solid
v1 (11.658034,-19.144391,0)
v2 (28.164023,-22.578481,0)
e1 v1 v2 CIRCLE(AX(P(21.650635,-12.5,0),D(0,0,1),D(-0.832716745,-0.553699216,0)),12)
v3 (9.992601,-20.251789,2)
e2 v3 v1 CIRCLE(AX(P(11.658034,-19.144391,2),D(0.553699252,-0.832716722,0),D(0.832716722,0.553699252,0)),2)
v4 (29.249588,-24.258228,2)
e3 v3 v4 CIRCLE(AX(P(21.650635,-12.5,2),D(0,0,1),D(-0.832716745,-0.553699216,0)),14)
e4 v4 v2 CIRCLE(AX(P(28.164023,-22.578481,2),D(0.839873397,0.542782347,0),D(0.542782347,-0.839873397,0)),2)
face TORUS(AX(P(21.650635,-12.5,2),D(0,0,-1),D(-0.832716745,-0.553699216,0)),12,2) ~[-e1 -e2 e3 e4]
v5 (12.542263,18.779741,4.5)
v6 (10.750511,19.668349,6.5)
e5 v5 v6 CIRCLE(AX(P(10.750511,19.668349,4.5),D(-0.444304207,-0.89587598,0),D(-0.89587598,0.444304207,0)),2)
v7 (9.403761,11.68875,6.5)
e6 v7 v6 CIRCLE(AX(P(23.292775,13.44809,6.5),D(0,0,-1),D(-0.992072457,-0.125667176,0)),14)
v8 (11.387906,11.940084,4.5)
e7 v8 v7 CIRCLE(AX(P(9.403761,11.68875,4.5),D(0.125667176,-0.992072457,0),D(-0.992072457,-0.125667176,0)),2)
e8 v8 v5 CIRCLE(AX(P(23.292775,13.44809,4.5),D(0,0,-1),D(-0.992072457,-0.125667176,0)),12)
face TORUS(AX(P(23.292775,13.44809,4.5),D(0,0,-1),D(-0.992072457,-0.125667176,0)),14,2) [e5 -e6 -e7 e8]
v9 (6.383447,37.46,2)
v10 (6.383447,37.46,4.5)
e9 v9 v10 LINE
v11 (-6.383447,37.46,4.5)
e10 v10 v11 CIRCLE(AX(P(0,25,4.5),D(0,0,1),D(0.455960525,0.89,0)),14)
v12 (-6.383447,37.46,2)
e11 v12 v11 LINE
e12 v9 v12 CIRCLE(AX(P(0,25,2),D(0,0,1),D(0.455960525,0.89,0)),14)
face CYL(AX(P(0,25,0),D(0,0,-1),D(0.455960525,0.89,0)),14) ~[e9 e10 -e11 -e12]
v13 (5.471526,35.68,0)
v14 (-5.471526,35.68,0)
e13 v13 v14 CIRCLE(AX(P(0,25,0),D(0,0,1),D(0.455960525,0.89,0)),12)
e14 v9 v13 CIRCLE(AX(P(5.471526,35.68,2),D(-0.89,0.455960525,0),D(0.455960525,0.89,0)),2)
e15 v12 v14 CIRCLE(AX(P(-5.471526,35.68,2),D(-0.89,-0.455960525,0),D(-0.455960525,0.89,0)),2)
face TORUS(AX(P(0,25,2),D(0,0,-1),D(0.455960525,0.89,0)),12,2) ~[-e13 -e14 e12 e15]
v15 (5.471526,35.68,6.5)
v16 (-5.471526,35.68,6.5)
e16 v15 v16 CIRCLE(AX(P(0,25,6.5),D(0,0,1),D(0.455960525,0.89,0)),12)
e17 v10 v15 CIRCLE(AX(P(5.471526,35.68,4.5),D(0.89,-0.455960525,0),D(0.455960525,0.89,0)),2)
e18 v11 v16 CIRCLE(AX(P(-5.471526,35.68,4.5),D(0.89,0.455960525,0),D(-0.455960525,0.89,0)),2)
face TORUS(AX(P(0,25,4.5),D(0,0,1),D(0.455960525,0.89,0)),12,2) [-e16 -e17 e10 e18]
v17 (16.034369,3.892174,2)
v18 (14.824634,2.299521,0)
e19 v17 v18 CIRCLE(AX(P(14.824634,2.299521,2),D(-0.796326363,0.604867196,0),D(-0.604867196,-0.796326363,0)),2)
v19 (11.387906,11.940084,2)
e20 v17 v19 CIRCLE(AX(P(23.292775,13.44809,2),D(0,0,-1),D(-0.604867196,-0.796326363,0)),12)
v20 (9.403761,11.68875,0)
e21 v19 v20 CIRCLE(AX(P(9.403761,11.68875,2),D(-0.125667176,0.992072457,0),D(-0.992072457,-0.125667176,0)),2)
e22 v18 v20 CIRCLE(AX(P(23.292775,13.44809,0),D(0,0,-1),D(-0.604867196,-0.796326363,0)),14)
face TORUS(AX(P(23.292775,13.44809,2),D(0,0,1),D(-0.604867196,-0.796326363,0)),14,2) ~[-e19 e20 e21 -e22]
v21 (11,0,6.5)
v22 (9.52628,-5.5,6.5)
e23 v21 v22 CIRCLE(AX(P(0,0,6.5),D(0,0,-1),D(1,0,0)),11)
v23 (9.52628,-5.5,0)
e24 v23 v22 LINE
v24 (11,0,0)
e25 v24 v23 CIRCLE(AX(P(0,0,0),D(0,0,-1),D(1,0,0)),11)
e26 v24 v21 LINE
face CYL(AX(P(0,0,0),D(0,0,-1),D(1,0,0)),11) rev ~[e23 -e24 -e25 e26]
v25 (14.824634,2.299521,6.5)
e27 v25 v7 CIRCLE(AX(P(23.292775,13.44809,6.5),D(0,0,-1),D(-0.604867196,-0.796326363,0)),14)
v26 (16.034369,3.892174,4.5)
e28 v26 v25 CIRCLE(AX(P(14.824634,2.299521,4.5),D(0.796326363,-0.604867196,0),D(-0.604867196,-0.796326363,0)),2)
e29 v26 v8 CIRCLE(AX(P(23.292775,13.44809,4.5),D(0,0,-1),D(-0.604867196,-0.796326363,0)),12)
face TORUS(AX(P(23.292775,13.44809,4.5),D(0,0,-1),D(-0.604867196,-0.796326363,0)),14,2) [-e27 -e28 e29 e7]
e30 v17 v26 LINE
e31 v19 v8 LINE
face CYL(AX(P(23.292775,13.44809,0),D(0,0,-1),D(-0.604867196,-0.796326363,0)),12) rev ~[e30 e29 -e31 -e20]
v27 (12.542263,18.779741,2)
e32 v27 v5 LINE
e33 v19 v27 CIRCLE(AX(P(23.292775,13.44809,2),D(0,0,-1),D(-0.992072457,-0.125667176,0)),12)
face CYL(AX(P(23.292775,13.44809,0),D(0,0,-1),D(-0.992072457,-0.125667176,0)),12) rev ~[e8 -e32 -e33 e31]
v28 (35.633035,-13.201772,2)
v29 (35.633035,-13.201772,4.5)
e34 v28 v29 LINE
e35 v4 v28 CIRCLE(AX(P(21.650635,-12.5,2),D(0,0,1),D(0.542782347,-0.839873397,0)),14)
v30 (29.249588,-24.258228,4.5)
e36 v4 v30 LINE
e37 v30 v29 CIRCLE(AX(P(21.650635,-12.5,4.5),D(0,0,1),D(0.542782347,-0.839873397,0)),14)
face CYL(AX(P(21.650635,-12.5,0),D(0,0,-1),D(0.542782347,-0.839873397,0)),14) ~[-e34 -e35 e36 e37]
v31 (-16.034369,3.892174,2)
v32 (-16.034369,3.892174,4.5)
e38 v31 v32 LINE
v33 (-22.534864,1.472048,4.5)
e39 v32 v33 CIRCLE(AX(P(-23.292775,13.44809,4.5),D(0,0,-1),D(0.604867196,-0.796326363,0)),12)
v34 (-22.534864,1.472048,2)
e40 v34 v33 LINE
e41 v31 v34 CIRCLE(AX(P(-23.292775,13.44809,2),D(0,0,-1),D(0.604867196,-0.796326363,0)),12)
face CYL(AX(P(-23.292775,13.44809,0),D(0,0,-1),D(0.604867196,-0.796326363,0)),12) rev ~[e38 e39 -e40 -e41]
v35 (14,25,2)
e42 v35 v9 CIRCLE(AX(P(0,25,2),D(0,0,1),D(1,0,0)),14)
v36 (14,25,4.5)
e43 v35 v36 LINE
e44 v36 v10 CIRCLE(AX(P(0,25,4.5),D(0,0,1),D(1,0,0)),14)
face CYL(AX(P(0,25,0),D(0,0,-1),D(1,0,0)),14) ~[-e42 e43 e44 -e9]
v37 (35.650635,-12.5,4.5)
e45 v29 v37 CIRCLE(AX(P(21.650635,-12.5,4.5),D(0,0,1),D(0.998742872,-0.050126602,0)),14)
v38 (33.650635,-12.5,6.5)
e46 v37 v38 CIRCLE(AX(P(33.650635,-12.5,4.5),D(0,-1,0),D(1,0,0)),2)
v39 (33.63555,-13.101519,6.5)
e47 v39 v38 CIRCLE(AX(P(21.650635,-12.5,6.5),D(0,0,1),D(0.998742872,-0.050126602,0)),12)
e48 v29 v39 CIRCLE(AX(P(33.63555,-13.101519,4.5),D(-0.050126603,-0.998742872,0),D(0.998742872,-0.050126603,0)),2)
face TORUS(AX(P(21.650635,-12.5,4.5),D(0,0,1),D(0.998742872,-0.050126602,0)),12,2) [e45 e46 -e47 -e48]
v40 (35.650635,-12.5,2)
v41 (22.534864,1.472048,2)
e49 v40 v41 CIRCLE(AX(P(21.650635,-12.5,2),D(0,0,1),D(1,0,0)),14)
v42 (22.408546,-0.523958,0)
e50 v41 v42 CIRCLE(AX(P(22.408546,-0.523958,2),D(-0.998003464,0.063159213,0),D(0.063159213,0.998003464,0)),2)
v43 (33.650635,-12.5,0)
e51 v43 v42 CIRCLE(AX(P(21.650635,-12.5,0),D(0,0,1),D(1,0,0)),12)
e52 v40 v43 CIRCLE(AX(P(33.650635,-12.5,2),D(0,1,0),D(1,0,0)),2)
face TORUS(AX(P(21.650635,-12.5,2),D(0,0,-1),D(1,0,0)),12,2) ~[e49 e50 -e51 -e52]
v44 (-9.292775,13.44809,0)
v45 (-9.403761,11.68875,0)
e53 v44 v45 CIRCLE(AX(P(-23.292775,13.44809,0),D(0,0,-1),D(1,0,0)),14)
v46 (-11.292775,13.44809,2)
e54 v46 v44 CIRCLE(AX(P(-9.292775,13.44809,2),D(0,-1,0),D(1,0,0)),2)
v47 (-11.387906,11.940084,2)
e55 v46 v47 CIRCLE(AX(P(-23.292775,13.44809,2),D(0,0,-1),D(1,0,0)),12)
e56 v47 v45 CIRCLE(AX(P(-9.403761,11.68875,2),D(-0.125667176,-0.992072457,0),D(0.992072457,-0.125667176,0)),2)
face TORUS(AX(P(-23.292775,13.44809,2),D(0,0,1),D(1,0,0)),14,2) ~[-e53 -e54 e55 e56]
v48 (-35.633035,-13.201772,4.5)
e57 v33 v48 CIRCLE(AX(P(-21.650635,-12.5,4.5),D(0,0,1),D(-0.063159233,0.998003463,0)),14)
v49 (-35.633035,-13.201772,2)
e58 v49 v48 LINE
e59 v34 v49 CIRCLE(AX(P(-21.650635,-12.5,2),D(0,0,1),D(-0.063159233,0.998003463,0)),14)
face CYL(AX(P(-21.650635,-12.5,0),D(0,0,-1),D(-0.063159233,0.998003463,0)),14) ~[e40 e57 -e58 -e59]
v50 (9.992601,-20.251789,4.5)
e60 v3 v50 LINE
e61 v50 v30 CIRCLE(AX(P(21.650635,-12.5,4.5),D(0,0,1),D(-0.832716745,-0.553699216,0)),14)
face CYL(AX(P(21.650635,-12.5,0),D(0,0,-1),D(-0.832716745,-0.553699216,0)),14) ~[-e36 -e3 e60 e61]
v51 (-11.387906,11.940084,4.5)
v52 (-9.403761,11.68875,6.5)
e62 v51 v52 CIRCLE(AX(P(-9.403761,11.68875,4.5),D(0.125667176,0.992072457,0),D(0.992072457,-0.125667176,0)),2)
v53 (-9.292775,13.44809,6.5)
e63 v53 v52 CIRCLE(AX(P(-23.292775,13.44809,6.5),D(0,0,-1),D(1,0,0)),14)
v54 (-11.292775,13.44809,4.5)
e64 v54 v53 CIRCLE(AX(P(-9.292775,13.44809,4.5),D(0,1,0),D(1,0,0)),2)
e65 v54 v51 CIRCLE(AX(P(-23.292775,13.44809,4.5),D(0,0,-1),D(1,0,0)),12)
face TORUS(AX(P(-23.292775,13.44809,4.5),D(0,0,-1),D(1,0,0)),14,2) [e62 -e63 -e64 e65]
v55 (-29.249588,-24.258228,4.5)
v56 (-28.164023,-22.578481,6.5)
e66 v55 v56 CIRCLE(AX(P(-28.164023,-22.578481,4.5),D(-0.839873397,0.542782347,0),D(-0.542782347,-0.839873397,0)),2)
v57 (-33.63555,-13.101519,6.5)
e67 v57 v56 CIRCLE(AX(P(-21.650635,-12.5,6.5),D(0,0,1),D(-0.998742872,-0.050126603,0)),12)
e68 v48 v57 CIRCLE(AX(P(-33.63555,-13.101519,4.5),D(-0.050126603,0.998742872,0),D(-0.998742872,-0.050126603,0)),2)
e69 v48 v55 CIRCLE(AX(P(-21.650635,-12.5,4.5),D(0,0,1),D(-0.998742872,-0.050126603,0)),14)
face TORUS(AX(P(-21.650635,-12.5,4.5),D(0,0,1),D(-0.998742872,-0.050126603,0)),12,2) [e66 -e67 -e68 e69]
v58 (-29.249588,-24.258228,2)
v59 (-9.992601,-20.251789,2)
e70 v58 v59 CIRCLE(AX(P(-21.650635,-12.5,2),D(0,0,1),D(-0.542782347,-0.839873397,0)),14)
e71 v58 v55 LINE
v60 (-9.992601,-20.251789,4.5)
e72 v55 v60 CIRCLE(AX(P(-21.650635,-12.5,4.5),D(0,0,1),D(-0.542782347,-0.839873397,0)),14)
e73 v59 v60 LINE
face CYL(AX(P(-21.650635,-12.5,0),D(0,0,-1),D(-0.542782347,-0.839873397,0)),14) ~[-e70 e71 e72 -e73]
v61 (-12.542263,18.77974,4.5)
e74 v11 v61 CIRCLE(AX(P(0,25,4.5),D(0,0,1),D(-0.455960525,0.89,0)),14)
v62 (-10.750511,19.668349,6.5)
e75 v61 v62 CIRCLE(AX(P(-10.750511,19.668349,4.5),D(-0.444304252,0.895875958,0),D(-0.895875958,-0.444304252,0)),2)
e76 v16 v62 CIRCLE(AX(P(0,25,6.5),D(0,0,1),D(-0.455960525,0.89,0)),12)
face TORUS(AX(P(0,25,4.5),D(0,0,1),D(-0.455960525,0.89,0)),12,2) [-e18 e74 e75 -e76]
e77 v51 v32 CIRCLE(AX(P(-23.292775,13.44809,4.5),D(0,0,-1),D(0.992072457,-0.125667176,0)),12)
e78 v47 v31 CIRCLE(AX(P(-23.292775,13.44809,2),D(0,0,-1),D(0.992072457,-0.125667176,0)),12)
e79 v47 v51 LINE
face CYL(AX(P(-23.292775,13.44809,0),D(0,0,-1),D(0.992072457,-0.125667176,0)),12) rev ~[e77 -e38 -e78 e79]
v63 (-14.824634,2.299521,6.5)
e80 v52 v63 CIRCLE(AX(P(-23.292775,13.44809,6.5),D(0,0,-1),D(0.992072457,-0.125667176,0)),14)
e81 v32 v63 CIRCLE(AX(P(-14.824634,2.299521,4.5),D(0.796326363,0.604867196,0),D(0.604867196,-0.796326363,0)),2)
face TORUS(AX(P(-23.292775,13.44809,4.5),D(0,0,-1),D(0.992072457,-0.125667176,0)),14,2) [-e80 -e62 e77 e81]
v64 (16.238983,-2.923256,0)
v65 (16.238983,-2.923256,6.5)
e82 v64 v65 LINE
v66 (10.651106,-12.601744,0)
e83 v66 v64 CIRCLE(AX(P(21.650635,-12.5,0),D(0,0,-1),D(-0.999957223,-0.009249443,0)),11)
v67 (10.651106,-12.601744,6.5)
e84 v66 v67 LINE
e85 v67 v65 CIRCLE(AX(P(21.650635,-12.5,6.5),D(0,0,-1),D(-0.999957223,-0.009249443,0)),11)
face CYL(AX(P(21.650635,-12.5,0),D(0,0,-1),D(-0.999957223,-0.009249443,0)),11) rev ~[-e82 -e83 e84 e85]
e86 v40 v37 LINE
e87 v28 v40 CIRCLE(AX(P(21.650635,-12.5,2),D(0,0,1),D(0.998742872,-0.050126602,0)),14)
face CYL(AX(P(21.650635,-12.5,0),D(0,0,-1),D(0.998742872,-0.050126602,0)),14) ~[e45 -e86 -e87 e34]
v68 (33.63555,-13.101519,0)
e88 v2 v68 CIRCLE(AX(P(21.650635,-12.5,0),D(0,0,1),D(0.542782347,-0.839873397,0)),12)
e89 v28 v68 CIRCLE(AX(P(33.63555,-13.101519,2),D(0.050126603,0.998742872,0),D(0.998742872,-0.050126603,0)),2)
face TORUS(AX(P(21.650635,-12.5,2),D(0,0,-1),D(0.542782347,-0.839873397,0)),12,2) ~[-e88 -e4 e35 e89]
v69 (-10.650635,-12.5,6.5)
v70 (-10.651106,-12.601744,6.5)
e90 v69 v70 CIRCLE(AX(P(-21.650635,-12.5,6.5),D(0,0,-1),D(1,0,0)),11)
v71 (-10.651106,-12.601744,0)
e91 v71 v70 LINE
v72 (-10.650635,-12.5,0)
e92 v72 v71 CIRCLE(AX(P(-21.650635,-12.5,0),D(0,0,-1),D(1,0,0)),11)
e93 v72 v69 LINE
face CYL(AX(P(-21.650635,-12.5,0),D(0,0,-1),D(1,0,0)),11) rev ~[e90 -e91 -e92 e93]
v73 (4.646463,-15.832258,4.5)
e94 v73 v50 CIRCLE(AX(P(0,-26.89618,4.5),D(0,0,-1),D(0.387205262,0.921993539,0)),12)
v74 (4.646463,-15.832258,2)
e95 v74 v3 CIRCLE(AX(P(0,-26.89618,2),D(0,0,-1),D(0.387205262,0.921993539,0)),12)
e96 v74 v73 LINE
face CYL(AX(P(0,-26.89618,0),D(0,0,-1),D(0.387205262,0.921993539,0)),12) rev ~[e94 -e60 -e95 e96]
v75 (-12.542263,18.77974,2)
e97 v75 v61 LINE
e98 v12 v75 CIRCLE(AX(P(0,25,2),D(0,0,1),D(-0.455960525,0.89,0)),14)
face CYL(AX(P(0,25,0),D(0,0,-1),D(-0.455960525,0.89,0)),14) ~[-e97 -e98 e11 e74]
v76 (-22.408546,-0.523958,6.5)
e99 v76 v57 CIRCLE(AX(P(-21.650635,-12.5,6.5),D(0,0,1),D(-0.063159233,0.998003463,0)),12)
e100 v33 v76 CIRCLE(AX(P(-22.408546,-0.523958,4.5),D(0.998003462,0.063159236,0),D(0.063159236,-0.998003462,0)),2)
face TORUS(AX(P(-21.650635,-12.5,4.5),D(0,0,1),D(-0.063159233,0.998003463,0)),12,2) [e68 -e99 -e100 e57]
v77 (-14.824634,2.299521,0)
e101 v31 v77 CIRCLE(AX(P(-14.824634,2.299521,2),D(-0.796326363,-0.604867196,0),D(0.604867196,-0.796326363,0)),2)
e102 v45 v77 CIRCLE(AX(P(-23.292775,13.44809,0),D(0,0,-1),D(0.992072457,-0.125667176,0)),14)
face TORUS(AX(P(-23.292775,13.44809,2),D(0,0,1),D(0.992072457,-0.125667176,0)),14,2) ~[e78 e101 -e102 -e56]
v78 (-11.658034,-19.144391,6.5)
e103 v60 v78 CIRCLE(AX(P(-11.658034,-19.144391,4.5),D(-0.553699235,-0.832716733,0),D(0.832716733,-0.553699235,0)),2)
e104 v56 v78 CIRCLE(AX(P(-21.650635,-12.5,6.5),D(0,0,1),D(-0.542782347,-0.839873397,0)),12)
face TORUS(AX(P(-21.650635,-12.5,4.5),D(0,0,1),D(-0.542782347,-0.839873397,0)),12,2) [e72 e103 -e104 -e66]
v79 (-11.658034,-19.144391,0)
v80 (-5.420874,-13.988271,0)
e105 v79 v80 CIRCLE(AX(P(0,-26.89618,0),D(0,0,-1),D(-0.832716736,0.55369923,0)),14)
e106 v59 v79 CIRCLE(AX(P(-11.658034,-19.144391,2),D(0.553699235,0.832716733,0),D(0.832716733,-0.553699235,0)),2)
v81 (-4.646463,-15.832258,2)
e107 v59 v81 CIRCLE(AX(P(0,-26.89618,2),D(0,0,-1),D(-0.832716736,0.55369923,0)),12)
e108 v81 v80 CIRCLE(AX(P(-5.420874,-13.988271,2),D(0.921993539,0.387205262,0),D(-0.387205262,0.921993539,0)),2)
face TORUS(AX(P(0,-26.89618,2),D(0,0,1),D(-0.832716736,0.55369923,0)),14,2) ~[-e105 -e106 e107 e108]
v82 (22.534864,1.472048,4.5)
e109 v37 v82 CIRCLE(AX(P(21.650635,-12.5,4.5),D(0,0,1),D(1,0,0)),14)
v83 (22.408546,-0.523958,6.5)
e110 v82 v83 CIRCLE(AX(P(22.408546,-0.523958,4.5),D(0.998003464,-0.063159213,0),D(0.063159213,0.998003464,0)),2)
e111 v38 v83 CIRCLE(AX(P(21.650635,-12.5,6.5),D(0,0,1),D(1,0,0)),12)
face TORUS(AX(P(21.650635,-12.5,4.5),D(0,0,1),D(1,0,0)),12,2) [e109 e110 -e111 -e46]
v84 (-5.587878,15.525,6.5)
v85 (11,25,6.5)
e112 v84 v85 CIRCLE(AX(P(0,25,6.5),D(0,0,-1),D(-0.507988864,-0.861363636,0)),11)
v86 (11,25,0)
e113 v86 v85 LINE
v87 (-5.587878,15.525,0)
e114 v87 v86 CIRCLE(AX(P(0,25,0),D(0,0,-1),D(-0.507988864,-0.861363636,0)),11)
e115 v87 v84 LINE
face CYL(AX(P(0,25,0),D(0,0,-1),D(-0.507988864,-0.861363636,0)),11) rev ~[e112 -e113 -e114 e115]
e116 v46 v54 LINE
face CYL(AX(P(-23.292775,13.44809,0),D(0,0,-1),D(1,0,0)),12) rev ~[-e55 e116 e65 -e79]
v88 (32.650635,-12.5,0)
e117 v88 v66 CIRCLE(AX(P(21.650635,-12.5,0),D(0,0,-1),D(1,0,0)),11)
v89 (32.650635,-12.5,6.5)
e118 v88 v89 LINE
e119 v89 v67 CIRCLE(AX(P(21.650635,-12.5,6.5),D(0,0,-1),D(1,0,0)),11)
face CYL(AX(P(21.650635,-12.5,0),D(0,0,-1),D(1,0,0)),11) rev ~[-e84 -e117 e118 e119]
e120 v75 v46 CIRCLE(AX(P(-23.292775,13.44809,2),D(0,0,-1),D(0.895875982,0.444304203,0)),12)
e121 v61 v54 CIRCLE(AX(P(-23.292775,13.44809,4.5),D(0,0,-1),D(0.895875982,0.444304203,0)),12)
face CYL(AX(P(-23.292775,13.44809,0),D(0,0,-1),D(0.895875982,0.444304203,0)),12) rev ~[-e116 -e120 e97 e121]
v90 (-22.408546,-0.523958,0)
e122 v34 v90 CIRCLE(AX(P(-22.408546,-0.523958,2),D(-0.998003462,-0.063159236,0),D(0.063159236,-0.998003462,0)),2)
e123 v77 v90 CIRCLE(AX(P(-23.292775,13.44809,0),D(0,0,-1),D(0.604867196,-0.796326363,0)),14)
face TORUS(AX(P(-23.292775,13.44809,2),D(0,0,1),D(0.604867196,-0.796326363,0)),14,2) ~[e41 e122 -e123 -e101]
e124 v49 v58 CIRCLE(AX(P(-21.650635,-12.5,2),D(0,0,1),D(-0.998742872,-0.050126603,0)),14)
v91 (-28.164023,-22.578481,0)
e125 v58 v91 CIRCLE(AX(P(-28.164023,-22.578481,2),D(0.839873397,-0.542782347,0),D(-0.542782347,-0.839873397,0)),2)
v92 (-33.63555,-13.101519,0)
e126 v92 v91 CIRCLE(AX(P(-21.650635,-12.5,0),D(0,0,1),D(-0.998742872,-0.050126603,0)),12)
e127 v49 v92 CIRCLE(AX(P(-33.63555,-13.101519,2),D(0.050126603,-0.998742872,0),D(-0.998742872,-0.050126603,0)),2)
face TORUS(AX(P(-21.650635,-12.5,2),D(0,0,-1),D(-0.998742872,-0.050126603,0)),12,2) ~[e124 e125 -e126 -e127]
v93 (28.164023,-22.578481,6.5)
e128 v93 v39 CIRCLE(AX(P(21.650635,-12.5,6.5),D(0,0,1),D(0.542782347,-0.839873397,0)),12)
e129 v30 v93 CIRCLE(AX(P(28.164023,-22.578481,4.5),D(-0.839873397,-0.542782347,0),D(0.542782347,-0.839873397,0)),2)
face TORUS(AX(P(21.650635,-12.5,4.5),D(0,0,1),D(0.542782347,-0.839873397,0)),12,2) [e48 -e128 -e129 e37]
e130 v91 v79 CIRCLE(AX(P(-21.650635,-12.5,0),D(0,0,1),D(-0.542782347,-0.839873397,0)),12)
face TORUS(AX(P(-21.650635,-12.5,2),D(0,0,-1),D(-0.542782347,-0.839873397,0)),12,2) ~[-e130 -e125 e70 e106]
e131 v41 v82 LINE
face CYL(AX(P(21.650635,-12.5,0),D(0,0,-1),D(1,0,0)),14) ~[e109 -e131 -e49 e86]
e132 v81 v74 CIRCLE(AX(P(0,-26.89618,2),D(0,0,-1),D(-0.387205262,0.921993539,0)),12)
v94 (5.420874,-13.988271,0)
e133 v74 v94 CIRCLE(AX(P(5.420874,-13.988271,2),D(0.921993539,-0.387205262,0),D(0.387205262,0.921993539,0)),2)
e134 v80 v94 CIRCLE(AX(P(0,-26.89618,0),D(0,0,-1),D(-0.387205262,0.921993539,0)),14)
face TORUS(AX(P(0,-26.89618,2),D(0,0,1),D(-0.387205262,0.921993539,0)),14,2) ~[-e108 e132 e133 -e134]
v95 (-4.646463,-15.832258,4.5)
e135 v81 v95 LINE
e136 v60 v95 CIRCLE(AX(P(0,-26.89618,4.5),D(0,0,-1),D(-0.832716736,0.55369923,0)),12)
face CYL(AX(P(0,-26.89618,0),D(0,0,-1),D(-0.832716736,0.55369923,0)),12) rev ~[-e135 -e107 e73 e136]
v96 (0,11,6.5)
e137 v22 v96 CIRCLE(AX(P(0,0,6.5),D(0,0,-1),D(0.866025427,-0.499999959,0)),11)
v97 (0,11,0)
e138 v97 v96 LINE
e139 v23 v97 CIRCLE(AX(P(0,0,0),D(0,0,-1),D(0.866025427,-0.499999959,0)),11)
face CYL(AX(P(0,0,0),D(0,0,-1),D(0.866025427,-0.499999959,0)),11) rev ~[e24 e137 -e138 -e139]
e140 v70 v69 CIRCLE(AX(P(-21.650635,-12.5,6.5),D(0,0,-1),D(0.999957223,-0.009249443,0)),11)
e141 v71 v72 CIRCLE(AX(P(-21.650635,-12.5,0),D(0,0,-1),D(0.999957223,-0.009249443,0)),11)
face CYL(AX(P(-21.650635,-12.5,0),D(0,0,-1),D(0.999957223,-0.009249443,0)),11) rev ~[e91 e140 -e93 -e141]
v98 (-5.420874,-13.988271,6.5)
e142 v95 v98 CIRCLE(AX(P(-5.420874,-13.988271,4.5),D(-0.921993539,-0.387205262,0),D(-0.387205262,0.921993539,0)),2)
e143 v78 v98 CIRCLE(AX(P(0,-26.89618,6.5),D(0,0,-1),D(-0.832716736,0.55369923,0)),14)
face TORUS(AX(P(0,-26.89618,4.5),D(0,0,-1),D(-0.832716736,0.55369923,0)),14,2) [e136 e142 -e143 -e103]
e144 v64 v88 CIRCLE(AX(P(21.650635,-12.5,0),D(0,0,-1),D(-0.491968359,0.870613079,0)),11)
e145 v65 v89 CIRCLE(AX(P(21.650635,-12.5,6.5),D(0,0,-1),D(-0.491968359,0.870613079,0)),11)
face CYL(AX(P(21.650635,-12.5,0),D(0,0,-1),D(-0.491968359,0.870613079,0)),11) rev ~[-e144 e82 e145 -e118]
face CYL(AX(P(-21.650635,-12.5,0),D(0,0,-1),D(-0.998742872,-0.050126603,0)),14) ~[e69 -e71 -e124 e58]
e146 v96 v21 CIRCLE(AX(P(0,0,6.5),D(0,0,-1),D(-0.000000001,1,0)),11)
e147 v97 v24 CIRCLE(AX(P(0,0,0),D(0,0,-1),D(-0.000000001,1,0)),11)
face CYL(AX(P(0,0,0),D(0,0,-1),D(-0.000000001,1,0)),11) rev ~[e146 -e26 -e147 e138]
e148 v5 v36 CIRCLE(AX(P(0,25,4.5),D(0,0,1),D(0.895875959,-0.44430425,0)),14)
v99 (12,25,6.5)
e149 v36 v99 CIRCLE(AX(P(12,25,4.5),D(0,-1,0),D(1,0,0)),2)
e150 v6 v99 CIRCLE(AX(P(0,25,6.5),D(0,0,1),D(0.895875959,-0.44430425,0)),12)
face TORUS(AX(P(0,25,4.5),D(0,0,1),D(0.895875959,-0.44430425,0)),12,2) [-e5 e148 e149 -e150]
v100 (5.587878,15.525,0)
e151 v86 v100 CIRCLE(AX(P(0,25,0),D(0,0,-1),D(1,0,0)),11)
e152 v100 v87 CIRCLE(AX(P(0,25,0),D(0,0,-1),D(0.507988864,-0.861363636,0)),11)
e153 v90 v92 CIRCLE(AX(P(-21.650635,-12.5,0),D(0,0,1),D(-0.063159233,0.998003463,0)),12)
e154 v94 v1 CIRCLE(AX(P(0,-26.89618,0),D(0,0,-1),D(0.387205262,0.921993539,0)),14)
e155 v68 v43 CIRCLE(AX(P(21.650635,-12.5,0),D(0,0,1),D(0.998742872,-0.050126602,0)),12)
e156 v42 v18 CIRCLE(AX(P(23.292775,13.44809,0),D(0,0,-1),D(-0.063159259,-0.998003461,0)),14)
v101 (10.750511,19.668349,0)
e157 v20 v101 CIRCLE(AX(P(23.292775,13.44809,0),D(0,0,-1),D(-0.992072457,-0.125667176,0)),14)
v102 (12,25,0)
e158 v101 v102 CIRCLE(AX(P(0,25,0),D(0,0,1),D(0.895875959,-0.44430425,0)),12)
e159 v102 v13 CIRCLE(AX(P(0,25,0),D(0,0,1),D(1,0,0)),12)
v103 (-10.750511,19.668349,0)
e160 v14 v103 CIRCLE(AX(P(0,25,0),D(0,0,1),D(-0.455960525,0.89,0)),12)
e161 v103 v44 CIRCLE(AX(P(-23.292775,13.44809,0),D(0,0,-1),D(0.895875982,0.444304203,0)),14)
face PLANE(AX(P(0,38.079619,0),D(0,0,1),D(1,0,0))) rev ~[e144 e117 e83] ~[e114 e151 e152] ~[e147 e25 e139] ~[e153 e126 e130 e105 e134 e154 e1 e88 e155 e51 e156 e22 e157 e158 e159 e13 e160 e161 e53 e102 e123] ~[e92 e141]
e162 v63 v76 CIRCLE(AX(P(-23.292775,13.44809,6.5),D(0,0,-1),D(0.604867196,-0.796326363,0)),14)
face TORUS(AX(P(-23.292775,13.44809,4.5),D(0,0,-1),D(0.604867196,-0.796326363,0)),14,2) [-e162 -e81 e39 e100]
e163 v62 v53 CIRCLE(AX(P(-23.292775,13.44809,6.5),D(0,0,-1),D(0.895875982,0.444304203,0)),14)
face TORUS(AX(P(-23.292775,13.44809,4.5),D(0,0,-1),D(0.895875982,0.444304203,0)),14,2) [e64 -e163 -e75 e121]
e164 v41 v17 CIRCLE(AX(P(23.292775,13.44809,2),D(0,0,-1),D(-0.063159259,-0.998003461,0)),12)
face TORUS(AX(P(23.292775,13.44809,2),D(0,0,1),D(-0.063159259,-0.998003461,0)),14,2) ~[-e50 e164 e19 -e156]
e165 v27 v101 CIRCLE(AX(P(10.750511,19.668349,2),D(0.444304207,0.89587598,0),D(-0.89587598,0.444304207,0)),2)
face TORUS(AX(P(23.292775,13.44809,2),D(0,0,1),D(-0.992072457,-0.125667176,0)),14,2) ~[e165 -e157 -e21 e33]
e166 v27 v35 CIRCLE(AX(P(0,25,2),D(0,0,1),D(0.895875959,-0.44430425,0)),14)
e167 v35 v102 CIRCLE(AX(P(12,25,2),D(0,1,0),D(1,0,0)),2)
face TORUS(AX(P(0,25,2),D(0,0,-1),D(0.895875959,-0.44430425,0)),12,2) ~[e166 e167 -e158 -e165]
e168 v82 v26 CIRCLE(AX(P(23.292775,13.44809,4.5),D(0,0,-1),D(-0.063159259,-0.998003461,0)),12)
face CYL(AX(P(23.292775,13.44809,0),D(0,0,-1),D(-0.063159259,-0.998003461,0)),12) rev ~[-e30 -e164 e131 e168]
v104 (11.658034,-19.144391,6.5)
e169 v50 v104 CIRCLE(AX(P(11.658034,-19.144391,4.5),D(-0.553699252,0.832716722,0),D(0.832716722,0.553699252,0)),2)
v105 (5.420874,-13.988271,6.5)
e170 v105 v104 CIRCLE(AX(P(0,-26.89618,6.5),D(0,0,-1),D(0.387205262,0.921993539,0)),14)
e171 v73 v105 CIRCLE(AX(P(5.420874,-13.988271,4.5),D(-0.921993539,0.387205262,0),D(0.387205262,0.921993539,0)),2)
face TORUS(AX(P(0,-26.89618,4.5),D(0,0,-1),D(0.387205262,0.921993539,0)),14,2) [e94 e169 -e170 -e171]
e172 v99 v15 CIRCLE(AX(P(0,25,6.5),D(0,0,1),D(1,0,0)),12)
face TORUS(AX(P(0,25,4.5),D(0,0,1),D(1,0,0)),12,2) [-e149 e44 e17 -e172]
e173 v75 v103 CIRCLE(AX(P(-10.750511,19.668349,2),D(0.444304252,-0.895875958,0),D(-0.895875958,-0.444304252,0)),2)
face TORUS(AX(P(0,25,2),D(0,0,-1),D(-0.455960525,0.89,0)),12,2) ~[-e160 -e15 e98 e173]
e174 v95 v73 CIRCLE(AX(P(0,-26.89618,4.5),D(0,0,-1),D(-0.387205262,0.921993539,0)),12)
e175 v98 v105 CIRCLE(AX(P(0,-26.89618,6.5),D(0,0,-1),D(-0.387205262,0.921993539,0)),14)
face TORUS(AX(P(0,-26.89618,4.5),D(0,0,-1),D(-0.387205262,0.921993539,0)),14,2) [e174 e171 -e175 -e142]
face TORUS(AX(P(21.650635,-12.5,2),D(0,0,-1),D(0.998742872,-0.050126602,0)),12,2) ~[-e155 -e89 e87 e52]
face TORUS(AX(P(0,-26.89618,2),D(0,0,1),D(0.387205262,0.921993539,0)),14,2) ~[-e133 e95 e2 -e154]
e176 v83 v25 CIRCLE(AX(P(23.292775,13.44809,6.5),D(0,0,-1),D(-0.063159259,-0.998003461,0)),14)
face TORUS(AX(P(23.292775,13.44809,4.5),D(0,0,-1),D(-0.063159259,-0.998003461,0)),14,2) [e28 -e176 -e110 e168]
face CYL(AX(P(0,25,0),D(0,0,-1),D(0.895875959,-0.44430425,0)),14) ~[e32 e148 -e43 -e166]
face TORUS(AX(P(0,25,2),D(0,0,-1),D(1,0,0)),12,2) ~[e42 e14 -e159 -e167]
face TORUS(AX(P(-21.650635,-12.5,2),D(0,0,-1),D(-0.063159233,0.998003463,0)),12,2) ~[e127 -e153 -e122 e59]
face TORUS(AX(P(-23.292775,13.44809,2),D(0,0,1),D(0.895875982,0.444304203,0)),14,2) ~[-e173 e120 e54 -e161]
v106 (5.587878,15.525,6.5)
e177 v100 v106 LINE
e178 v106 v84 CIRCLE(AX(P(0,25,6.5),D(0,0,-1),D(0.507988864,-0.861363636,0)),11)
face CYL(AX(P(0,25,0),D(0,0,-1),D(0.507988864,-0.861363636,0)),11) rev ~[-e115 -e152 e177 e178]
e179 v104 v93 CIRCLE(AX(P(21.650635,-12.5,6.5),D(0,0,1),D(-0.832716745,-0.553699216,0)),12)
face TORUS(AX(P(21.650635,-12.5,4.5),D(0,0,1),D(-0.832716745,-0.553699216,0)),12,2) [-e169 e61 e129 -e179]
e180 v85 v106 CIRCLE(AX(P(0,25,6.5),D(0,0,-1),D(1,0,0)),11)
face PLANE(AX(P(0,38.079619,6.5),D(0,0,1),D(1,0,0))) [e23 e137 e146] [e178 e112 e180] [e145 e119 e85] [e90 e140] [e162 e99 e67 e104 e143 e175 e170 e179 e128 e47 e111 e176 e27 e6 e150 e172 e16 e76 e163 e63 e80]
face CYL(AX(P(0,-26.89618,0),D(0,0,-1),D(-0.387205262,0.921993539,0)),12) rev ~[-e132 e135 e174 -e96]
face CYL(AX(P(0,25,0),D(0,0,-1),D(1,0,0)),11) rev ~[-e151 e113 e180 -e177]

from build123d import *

# Parameters (mm, degrees)
F1_DEPTH = 6.5
F2_R     = 2


# Not quite as in the source:
# - a feature names something its author has since deleted; it is built from what else it names


with BuildPart() as f1:
    # F0 (on Top) → F1 (new body)
    with BuildSketch(Plane.XY):
        with BuildLine():
            ThreePointArc((6.3834473445, 37.46), (0, 39), (-6.3834473445, 37.46))
            ThreePointArc((-6.3834473445, 37.46), (0, 38), (6.3834473445, 37.46))
        make_face()
        with BuildLine():
            ThreePointArc((-12.5422634057, 18.7797404667), (-10.8800030067, 16.1894645694), (-8.6919143461, 14.025))
            ThreePointArc((-8.6919143461, 14.025), (-7.1791791885, 14.8562911313), (-5.587877504, 15.525))
            ThreePointArc((-5.587877504, 15.525), (-5.4558843213, 34.5516138046), (11, 25))
            ThreePointArc((11, 25), (9.5516138046, 19.5441156787), (5.587877504, 15.525))
            ThreePointArc((5.587877504, 15.525), (7.1791791885, 14.8562911313), (8.6919143461, 14.025))
            ThreePointArc((8.6919143461, 14.025), (10.8800030203, 16.1894645861), (12.5422634249, 18.7797405054))
            ThreePointArc((12.5422634249, 18.7797405054), (13.630694919, 21.8056055307), (14, 25))
            ThreePointArc((14, 25), (11.9450463127, 32.3017716062), (6.3834473445, 37.46))
            ThreePointArc((6.3834473445, 37.46), (0, 38), (-6.3834473445, 37.46))
            ThreePointArc((-6.3834473445, 37.46), (-13.2960015008, 29.3836450691), (-12.5422634057, 18.7797404667))
        make_face()
        with BuildLine():
            ThreePointArc((-9.5262796431, -5.499999651), (-9.5262793442, 5.5000001687), (-1.34e-08, 11))
            ThreePointArc((-1.34e-08, 11), (-4.6016301523, 11.7778594796), (-8.6919143461, 14.025))
            ThreePointArc((-8.6919143461, 14.025), (-10.0938848824, 13.0523364951), (-11.3879056975, 11.940083912))
            ThreePointArc((-11.3879056975, 11.940083912), (-12.9004703417, 7.4480900244), (-16.0343688398, 3.8921736739))
            ThreePointArc((-16.0343688398, 3.8921736739), (-16.3505974247, 2.2153924835), (-16.4919634611, 0.5149186312))
            ThreePointArc((-16.4919634611, 0.5149186312), (-12.5007407351, -1.9038010018), (-9.5262796431, -5.499999651))
        make_face()
        with BuildLine():
            ThreePointArc((-1.34e-08, 11), (7.7781745883, 7.7781745978), (11, 0))
            ThreePointArc((11, 0), (10.6251841562, -2.8470092462), (9.5262797004, -5.4999995518))
            ThreePointArc((9.5262797004, -5.4999995518), (12.5007407784, -1.9038009644), (16.4919634611, 0.5149186312))
            ThreePointArc((16.4919634611, 0.5149186312), (16.3505974247, 2.2153924835), (16.0343688398, 3.8921736739))
            ThreePointArc((16.0343688398, 3.8921736739), (12.9004703417, 7.4480900244), (11.3879056975, 11.940083912))
            ThreePointArc((11.3879056975, 11.940083912), (10.0938848824, 13.0523364951), (8.6919143461, 14.025))
            ThreePointArc((8.6919143461, 14.025), (4.6016301396, 11.7778594752), (-1.34e-08, 11))
        make_face()
        with BuildLine():
            ThreePointArc((7.800049115, -14.5399186312), (7.8991104852, -9.8740580897), (9.5262797004, -5.4999995518))
            ThreePointArc((9.5262797004, -5.4999995518), (5.73e-08, -11), (-9.5262796431, -5.499999651))
            ThreePointArc((-9.5262796431, -5.499999651), (-8.1276735787, -8.876533174), (-7.6506350946, -12.5))
            ThreePointArc((-7.6506350946, -12.5), (-7.6880385647, -13.5226916167), (-7.800049115, -14.5399186312))
            ThreePointArc((-7.800049115, -14.5399186312), (-6.2567125423, -15.2677289786), (-4.6464631424, -15.8322575859))
            ThreePointArc((-4.6464631424, -15.8322575859), (0, -14.8961800489), (4.6464631424, -15.8322575859))
            ThreePointArc((4.6464631424, -15.8322575859), (6.2567125423, -15.2677289786), (7.800049115, -14.5399186312))
        make_face()
        with BuildLine():
            ThreePointArc((-16.2389831458, -2.9232561283), (-16.45551512, -1.2107940101), (-16.4919634611, 0.5149186312))
            ThreePointArc((-16.4919634611, 0.5149186312), (-19.4604892606, 1.3276267387), (-22.53486436, 1.4720484757))
            ThreePointArc((-22.53486436, 1.4720484757), (-32.0949839483, -3.1771475919), (-35.633035298, -13.2017724359))
            ThreePointArc((-35.633035298, -13.2017724359), (-32.9089653438, -19), (-29.2495879535, -24.2582275641))
            ThreePointArc((-29.2495879535, -24.2582275641), (-18.7989825271, -26.2064976429), (-9.9926008348, -20.25178929))
            ThreePointArc((-9.9926008348, -20.25178929), (-8.5804861576, -17.5170914646), (-7.800049115, -14.5399186312))
            ThreePointArc((-7.800049115, -14.5399186312), (-9.2763359315, -13.6454971212), (-10.6511056417, -12.6017438717))
            ThreePointArc((-10.6511056417, -12.6017438717), (-31.1769145362, -18), (-16.2389831458, -2.9232561283))
        make_face()
        with BuildLine():
            ThreePointArc((-29.2495879535, -24.2582275641), (-32.9089653438, -19), (-35.633035298, -13.2017724359))
            ThreePointArc((-35.633035298, -13.2017724359), (-33.7749907476, -19.5), (-29.2495879535, -24.2582275641))
        make_face()
        with BuildLine():
            ThreePointArc((22.5348640827, 1.4720484932), (19.4604891234, 1.327626717), (16.4919634611, 0.5149186312))
            ThreePointArc((16.4919634611, 0.5149186312), (16.4979907429, 0.2574906711), (16.5, 0))
            ThreePointArc((16.5, 0), (16.4346162399, -1.4674430304), (16.2389831458, -2.9232561283))
            ThreePointArc((16.2389831458, -2.9232561283), (27.1946331359, -2.9992586753), (32.6506350946, -12.5))
            ThreePointArc((32.6506350946, -12.5), (21.7015075745, -23.4998823626), (10.6511056417, -12.6017438717))
            ThreePointArc((10.6511056417, -12.6017438717), (9.2763359315, -13.6454971212), (7.800049115, -14.5399186312))
            ThreePointArc((7.800049115, -14.5399186312), (8.580486101, -17.5170913173), (9.9926006599, -20.2517890271))
            ThreePointArc((9.9926006599, -20.2517890271), (18.7989823725, -26.2064976107), (29.2495879535, -24.2582275641))
            ThreePointArc((29.2495879535, -24.2582275641), (32.9089653438, -19), (35.633035298, -13.2017724359))
            ThreePointArc((35.633035298, -13.2017724359), (35.6462344538, -12.8509965472), (35.6506350946, -12.5))
            ThreePointArc((35.6506350946, -12.5), (31.8579659366, -2.9182257863), (22.5348640827, 1.4720484932))
        make_face()
        with BuildLine():
            ThreePointArc((35.633035298, -13.2017724359), (32.9089653438, -19), (29.2495879535, -24.2582275641))
            ThreePointArc((29.2495879535, -24.2582275641), (33.7749907476, -19.5), (35.633035298, -13.2017724359))
        make_face()
        with BuildLine():
            ThreePointArc((12.5422634249, 18.7797405054), (10.8800030203, 16.1894645861), (8.6919143461, 14.025))
            ThreePointArc((8.6919143461, 14.025), (10.0938848824, 13.0523364951), (11.3879056975, 11.940083912))
            ThreePointArc((11.3879056975, 11.940083912), (11.4601169695, 15.4451377216), (12.5422634249, 18.7797405054))
        make_face()
        with BuildLine():
            ThreePointArc((-11.3879056975, 11.940083912), (-10.0938848824, 13.0523364951), (-8.6919143461, 14.025))
            ThreePointArc((-8.6919143461, 14.025), (-10.8800030067, 16.1894645694), (-12.5422634057, 18.7797404667))
            ThreePointArc((-12.5422634057, 18.7797404667), (-11.609322329, 16.1861421262), (-11.2927751871, 13.4480900244))
            ThreePointArc((-11.2927751871, 13.4480900244), (-11.3165814287, 12.6925881632), (-11.3879056975, 11.940083912))
        make_face()
        with BuildLine():
            ThreePointArc((-4.6464631424, -15.8322575859), (-6.2567125423, -15.2677289786), (-7.800049115, -14.5399186312))
            ThreePointArc((-7.800049115, -14.5399186312), (-8.5804861576, -17.5170914646), (-9.9926008348, -20.25178929))
            ThreePointArc((-9.9926008348, -20.25178929), (-7.6458232815, -17.6473213978), (-4.6464631424, -15.8322575859))
        make_face()
        with BuildLine():
            ThreePointArc((-7.6506350946, -12.5), (-8.1276735787, -8.876533174), (-9.5262796431, -5.499999651))
            ThreePointArc((-9.5262796431, -5.499999651), (-12.5007407351, -1.9038010018), (-16.4919634611, 0.5149186312))
            ThreePointArc((-16.4919634611, 0.5149186312), (-16.45551512, -1.2107940101), (-16.2389831458, -2.9232561283))
            ThreePointArc((-16.2389831458, -2.9232561283), (-12.1498937699, -6.9560019588), (-10.6506350946, -12.5))
            ThreePointArc((-10.6506350946, -12.5), (-10.650752732, -12.5508724799), (-10.6511056417, -12.6017438717))
            ThreePointArc((-10.6511056417, -12.6017438717), (-9.2763359315, -13.6454971212), (-7.800049115, -14.5399186312))
            ThreePointArc((-7.800049115, -14.5399186312), (-7.6880385647, -13.5226916167), (-7.6506350946, -12.5))
        make_face()
        with BuildLine():
            ThreePointArc((-8.6919143461, 14.025), (-4.6016301523, 11.7778594796), (-1.34e-08, 11))
            ThreePointArc((-1.34e-08, 11), (4.6016301396, 11.7778594752), (8.6919143461, 14.025))
            ThreePointArc((8.6919143461, 14.025), (7.1791791885, 14.8562911313), (5.587877504, 15.525))
            ThreePointArc((5.587877504, 15.525), (0, 14), (-5.587877504, 15.525))
            ThreePointArc((-5.587877504, 15.525), (-7.1791791885, 14.8562911313), (-8.6919143461, 14.025))
        make_face()
        with BuildLine():
            ThreePointArc((16.4919634611, 0.5149186312), (12.5007407784, -1.9038009644), (9.5262797004, -5.4999995518))
            ThreePointArc((9.5262797004, -5.4999995518), (7.8991104852, -9.8740580897), (7.800049115, -14.5399186312))
            ThreePointArc((7.800049115, -14.5399186312), (9.2763359315, -13.6454971212), (10.6511056417, -12.6017438717))
            ThreePointArc((10.6511056417, -12.6017438717), (12.124355653, -7), (16.2389831458, -2.9232561283))
            ThreePointArc((16.2389831458, -2.9232561283), (16.4346162399, -1.4674430304), (16.5, 0))
            ThreePointArc((16.5, 0), (16.4979907429, 0.2574906711), (16.4919634611, 0.5149186312))
        make_face()
        with BuildLine():
            ThreePointArc((16.0343688398, 3.8921736739), (16.3505974247, 2.2153924835), (16.4919634611, 0.5149186312))
            ThreePointArc((16.4919634611, 0.5149186312), (19.4604891234, 1.327626717), (22.5348640827, 1.4720484932))
            ThreePointArc((22.5348640827, 1.4720484932), (19.1059401242, 2.2021835623), (16.0343688398, 3.8921736739))
        make_face()
        with BuildLine():
            ThreePointArc((-22.53486436, 1.4720484757), (-19.4604892606, 1.3276267387), (-16.4919634611, 0.5149186312))
            ThreePointArc((-16.4919634611, 0.5149186312), (-16.3505974247, 2.2153924835), (-16.0343688398, 3.8921736739))
            ThreePointArc((-16.0343688398, 3.8921736739), (-19.1059402544, 2.2021835138), (-22.53486436, 1.4720484757))
        make_face()
        with BuildLine():
            ThreePointArc((9.9926006599, -20.2517890271), (8.580486101, -17.5170913173), (7.800049115, -14.5399186312))
            ThreePointArc((7.800049115, -14.5399186312), (6.2567125423, -15.2677289786), (4.6464631424, -15.8322575859))
            ThreePointArc((4.6464631424, -15.8322575859), (7.6458231599, -17.6473212972), (9.9926006599, -20.2517890271))
        make_face()
    extrude(amount=F1_DEPTH)

    # F2
    f2_edges = [f1.edges().sort_by_distance(p)[0] for p in [
        (0, 39, 6.5),
        (0, 39, 0),
        (33.774991, -19.5, 0),
        (33.774991, -19.5, 6.5),
        (12.90047, 7.44809, 0),
        (12.90047, 7.44809, 6.5),
        (-12.90047, 7.44809, 0),
        (-12.90047, 7.44809, 6.5),
        (-33.774991, -19.5, 0),
        (-33.774991, -19.5, 6.5),
        (0, -14.89618, 0),
        (0, -14.89618, 6.5),
    ]]
    fillet(f2_edges, radius=F2_R)


solid = f1.part
